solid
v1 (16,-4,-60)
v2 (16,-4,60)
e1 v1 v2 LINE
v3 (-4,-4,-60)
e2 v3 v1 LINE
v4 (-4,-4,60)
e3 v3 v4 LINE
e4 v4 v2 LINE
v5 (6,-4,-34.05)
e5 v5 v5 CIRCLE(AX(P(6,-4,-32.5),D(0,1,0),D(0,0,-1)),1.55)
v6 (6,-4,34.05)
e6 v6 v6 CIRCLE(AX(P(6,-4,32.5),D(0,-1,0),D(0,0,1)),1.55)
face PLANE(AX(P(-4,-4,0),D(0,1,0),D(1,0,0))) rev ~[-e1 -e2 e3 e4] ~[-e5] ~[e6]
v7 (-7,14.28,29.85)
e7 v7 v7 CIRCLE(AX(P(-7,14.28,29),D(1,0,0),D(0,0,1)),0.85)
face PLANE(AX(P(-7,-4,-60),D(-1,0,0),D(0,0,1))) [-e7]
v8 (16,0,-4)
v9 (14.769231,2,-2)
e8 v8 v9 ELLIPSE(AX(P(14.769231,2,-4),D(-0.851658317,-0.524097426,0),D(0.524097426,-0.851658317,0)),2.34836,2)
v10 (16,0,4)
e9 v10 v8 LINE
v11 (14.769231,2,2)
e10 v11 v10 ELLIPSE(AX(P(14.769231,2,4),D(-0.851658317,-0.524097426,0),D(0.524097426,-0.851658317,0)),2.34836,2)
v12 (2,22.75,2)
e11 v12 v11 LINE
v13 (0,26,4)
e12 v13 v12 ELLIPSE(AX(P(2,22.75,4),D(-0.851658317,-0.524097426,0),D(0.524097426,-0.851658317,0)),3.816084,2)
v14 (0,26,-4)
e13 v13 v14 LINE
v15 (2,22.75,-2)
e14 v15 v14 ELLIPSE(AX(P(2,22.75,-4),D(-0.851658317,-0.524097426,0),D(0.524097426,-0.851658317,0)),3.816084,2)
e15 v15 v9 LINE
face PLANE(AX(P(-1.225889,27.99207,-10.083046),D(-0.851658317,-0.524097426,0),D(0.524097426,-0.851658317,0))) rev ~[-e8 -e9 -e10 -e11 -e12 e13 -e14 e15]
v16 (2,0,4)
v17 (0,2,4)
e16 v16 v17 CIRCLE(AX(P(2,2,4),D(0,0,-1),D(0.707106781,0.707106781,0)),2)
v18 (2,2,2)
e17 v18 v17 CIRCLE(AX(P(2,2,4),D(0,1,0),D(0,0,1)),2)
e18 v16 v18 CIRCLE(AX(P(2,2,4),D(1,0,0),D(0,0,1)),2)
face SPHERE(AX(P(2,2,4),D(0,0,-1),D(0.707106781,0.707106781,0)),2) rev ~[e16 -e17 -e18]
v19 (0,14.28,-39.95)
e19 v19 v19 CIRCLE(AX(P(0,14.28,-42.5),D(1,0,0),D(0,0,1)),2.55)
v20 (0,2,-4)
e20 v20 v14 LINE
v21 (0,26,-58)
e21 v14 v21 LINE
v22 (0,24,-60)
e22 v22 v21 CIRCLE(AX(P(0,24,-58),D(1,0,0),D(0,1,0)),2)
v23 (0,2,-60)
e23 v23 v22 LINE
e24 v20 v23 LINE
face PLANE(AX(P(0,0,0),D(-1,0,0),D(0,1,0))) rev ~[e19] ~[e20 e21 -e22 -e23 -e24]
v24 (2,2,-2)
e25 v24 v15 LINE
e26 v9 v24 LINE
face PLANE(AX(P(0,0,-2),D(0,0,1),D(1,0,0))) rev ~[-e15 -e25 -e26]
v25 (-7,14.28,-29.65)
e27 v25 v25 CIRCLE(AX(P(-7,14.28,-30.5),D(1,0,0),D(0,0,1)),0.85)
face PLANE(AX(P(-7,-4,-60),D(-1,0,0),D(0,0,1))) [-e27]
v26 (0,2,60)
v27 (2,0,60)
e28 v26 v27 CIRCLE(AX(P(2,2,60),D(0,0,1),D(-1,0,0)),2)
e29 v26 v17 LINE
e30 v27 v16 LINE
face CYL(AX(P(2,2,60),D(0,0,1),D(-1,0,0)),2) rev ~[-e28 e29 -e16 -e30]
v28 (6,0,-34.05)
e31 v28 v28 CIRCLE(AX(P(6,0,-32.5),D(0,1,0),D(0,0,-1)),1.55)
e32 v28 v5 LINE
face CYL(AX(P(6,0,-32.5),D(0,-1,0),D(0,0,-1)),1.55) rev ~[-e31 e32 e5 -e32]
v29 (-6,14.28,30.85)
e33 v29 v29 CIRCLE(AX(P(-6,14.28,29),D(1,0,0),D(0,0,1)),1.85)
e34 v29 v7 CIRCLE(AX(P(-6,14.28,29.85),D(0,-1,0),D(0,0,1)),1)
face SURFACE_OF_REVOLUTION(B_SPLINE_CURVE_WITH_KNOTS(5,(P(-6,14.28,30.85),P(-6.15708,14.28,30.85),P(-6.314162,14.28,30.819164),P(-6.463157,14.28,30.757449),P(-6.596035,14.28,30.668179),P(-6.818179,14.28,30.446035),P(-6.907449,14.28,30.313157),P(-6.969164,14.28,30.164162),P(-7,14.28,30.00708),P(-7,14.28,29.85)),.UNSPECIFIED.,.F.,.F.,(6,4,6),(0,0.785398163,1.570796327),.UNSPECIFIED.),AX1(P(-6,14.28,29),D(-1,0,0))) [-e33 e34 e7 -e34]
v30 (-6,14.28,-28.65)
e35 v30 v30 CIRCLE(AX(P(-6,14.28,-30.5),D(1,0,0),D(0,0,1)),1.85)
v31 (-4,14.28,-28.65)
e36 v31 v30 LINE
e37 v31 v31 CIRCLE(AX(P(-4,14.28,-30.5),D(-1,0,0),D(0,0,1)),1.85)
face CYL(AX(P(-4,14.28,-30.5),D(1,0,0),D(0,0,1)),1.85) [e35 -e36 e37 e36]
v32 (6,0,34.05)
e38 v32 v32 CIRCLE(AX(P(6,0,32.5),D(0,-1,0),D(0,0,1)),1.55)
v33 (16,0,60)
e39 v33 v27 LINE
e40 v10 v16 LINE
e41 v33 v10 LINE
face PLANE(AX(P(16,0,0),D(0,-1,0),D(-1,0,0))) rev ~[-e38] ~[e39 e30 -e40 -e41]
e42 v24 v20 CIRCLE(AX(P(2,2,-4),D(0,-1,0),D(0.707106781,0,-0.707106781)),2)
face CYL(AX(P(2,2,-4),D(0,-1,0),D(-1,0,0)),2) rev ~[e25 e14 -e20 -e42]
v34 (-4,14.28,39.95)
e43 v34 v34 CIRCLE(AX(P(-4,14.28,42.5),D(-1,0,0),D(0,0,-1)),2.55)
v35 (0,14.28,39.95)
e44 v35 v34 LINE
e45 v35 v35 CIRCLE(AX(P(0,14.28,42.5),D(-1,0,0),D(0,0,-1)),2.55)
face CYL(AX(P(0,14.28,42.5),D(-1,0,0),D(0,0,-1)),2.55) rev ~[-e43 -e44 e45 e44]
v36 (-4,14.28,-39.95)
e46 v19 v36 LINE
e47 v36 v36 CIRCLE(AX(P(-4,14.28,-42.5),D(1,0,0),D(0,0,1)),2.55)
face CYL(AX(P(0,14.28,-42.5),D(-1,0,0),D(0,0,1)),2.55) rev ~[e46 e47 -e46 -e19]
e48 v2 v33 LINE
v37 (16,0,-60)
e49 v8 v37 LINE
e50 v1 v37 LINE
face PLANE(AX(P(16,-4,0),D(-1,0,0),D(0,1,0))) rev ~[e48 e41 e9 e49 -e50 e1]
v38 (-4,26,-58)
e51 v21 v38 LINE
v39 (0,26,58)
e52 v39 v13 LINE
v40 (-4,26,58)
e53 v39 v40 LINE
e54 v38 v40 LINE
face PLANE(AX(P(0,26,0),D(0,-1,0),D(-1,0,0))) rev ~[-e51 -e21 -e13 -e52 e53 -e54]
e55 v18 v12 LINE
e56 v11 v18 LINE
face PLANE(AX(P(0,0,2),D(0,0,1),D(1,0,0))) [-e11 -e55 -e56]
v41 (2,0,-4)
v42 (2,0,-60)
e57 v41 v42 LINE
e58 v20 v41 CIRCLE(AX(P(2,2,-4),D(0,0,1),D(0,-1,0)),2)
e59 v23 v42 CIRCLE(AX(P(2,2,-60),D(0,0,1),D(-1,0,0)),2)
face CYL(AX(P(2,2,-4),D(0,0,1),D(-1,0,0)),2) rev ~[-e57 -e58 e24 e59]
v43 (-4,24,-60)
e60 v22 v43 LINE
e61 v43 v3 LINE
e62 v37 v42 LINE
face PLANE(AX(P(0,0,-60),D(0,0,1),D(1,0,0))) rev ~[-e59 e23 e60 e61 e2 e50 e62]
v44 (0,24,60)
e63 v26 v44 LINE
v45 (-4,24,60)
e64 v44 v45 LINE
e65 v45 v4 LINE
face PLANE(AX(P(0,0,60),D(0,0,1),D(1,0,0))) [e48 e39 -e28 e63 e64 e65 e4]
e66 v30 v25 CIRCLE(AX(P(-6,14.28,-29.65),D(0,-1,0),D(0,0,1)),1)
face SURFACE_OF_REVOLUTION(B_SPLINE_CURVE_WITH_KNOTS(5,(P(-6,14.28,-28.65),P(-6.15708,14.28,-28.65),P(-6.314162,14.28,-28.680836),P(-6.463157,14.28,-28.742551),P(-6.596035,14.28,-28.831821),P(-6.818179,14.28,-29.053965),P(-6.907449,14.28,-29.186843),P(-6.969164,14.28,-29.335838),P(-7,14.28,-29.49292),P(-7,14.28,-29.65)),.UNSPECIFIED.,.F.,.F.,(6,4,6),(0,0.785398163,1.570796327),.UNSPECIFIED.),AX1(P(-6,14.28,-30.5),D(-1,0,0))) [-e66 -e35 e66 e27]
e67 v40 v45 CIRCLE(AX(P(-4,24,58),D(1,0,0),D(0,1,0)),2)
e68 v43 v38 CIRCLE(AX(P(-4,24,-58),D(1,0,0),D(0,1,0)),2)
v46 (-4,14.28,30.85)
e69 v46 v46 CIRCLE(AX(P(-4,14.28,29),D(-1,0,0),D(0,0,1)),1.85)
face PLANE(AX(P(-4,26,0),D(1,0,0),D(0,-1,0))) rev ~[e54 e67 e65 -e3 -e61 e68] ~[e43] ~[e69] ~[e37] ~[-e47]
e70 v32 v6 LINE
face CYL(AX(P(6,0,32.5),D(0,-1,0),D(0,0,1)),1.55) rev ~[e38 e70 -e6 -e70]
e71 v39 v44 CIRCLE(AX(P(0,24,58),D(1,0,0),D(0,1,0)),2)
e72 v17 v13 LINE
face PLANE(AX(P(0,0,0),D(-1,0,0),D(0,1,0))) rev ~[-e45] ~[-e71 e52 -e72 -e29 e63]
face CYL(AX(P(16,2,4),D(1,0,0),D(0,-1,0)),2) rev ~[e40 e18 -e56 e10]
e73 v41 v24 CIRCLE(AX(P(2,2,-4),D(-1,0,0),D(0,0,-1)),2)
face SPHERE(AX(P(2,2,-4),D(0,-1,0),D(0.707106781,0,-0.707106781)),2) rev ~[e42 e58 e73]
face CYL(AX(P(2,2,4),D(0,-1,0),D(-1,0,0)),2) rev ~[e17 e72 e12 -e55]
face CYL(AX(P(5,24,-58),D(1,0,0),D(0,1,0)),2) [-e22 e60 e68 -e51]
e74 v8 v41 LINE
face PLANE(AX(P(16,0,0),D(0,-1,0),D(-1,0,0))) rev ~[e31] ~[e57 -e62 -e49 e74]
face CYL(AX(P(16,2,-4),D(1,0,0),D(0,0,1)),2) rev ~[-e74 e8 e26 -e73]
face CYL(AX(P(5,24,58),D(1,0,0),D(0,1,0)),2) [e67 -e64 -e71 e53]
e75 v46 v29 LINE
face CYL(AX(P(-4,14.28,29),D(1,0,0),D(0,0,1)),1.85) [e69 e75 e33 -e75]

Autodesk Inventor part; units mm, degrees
ref_plane "YZ Plane" through (0, 0, 0) normal (1, 0, 0) x (0, 1, 0)
ref_plane "XZ Plane" through (0, 0, 0) normal (0, 1, 0) x (-1, 0, 0)
ref_plane "XY Plane" through (0, 0, 0) normal (0, 0, 1) x (1, 0, 0)
sketch "Sketch1" plane through (0, 0, 0) normal (0, 0, 1) x (1, 0, 0)
  line L0 (-4, 26) -> (-4, -4)
  line L1 (-4, -4) -> (16, -4)
  line L2 (16, -4) -> (16, 0)
  line L3 (16, 0) -> (0, 0)
  line L4 (0, 0) -> (0, 26)
  line L5 (0, 26) -> (-4, 26)
  point P0 (0, 0)
  dimension "d0" = 30
  dimension "d1" = 20
  dimension "d2" = 4
  dimension "d3" = 4
extrude "Extrusion1" add sketch "Sketch1" along normal mid plane 120
sketch "Sketch2" plane through (0, 0, 0) normal (0, 0, 1) x (1, 0, 0)
  line L0 (0, 0) -> (0, 26) projected
  line L1 (16, -4) -> (16, 0) projected
  line L2 (0, 26) -> (16, 0)
  line L3 (16, 0) -> (0, 0)
extrude "Extrusion2" add sketch "Sketch2" along normal mid plane 4
fillet "Fillet1" radius 2 8 edges at (0, 0, 31) (0, 0, -31) (0, 13, 2) (8, 0, 2) (0, 13, -2) (8, 0, -2) (-2, 26, 60) (-2, 26, -60)
sketch "Sketch3" plane through (0, 2, 4) normal (1, 0, 0) x (0, 0, -1)
  line L0 (64, -6) -> (-56, -6) projected
  line L1 (8, 24) -> (0, 24) projected
  point P0 (4, -2)
  point P1 (-38.5, 12.28)
  point P2 (4, 24)
  dimension "d19" = 18.28
  dimension "d20" = 42.5
hole "Hole1" at (0, 14.28, 42.5) direction (-1, 0, 0) diameter 5.1 depth 4
mirror "Mirror1" about plane through (0, 0, 0) normal (0, 0, 1) of "Hole1"
sketch "Sketch4" plane through (2, 0, 4) normal (0, 1, 0) x (1, 0, 0)
  line L0 (14, 0) -> (14, -56) projected
  line L1 (14, 8) -> (14, 0) projected
  point P0 (-2, 4)
  point P1 (4, -28.5)
  point P2 (14, -50)
  point P3 (14, 4)
  dimension "d28" = 10
  dimension "d29" = 32.5
hole "Hole2" at (6, 0, 32.5) direction (0, -1, 0) diameter 3.1 depth 4
mirror "Mirror2" about plane through (0, 0, 0) normal (0, 0, 1) of "Hole2"
sketch "Sketch5" plane through (-4, -4, -60) normal (-1, 0, 0) x (0, 0, 1)
  circle A0 centre (89, 18.28) radius 1.85
  line L0 (144, 18.28) -> (-24, 18.28) projected
  line L1 (120, 28) -> (120, 0) projected
  circle A1 centre (29.5, 18.28) radius 1.85
  circle A2 centre (17.5, 18.28) radius 2.55 projected
  point P0 (60, 4)
  dimension "d31" = 3.7
  dimension "d32" = 31
  dimension "d33" = 3.7
  dimension "d34" = 12
extrude "Extrusion3" add sketch "Sketch5" along normal blind 3 contours L0 A0 | A0 L0 | A1 L0 | L0 A1
fillet "Fillet2" radius 1 2 edges at (-7, 14.28, -32.35) (-7, 14.28, 27.15)
properties part number "LV_Bracket_2"
